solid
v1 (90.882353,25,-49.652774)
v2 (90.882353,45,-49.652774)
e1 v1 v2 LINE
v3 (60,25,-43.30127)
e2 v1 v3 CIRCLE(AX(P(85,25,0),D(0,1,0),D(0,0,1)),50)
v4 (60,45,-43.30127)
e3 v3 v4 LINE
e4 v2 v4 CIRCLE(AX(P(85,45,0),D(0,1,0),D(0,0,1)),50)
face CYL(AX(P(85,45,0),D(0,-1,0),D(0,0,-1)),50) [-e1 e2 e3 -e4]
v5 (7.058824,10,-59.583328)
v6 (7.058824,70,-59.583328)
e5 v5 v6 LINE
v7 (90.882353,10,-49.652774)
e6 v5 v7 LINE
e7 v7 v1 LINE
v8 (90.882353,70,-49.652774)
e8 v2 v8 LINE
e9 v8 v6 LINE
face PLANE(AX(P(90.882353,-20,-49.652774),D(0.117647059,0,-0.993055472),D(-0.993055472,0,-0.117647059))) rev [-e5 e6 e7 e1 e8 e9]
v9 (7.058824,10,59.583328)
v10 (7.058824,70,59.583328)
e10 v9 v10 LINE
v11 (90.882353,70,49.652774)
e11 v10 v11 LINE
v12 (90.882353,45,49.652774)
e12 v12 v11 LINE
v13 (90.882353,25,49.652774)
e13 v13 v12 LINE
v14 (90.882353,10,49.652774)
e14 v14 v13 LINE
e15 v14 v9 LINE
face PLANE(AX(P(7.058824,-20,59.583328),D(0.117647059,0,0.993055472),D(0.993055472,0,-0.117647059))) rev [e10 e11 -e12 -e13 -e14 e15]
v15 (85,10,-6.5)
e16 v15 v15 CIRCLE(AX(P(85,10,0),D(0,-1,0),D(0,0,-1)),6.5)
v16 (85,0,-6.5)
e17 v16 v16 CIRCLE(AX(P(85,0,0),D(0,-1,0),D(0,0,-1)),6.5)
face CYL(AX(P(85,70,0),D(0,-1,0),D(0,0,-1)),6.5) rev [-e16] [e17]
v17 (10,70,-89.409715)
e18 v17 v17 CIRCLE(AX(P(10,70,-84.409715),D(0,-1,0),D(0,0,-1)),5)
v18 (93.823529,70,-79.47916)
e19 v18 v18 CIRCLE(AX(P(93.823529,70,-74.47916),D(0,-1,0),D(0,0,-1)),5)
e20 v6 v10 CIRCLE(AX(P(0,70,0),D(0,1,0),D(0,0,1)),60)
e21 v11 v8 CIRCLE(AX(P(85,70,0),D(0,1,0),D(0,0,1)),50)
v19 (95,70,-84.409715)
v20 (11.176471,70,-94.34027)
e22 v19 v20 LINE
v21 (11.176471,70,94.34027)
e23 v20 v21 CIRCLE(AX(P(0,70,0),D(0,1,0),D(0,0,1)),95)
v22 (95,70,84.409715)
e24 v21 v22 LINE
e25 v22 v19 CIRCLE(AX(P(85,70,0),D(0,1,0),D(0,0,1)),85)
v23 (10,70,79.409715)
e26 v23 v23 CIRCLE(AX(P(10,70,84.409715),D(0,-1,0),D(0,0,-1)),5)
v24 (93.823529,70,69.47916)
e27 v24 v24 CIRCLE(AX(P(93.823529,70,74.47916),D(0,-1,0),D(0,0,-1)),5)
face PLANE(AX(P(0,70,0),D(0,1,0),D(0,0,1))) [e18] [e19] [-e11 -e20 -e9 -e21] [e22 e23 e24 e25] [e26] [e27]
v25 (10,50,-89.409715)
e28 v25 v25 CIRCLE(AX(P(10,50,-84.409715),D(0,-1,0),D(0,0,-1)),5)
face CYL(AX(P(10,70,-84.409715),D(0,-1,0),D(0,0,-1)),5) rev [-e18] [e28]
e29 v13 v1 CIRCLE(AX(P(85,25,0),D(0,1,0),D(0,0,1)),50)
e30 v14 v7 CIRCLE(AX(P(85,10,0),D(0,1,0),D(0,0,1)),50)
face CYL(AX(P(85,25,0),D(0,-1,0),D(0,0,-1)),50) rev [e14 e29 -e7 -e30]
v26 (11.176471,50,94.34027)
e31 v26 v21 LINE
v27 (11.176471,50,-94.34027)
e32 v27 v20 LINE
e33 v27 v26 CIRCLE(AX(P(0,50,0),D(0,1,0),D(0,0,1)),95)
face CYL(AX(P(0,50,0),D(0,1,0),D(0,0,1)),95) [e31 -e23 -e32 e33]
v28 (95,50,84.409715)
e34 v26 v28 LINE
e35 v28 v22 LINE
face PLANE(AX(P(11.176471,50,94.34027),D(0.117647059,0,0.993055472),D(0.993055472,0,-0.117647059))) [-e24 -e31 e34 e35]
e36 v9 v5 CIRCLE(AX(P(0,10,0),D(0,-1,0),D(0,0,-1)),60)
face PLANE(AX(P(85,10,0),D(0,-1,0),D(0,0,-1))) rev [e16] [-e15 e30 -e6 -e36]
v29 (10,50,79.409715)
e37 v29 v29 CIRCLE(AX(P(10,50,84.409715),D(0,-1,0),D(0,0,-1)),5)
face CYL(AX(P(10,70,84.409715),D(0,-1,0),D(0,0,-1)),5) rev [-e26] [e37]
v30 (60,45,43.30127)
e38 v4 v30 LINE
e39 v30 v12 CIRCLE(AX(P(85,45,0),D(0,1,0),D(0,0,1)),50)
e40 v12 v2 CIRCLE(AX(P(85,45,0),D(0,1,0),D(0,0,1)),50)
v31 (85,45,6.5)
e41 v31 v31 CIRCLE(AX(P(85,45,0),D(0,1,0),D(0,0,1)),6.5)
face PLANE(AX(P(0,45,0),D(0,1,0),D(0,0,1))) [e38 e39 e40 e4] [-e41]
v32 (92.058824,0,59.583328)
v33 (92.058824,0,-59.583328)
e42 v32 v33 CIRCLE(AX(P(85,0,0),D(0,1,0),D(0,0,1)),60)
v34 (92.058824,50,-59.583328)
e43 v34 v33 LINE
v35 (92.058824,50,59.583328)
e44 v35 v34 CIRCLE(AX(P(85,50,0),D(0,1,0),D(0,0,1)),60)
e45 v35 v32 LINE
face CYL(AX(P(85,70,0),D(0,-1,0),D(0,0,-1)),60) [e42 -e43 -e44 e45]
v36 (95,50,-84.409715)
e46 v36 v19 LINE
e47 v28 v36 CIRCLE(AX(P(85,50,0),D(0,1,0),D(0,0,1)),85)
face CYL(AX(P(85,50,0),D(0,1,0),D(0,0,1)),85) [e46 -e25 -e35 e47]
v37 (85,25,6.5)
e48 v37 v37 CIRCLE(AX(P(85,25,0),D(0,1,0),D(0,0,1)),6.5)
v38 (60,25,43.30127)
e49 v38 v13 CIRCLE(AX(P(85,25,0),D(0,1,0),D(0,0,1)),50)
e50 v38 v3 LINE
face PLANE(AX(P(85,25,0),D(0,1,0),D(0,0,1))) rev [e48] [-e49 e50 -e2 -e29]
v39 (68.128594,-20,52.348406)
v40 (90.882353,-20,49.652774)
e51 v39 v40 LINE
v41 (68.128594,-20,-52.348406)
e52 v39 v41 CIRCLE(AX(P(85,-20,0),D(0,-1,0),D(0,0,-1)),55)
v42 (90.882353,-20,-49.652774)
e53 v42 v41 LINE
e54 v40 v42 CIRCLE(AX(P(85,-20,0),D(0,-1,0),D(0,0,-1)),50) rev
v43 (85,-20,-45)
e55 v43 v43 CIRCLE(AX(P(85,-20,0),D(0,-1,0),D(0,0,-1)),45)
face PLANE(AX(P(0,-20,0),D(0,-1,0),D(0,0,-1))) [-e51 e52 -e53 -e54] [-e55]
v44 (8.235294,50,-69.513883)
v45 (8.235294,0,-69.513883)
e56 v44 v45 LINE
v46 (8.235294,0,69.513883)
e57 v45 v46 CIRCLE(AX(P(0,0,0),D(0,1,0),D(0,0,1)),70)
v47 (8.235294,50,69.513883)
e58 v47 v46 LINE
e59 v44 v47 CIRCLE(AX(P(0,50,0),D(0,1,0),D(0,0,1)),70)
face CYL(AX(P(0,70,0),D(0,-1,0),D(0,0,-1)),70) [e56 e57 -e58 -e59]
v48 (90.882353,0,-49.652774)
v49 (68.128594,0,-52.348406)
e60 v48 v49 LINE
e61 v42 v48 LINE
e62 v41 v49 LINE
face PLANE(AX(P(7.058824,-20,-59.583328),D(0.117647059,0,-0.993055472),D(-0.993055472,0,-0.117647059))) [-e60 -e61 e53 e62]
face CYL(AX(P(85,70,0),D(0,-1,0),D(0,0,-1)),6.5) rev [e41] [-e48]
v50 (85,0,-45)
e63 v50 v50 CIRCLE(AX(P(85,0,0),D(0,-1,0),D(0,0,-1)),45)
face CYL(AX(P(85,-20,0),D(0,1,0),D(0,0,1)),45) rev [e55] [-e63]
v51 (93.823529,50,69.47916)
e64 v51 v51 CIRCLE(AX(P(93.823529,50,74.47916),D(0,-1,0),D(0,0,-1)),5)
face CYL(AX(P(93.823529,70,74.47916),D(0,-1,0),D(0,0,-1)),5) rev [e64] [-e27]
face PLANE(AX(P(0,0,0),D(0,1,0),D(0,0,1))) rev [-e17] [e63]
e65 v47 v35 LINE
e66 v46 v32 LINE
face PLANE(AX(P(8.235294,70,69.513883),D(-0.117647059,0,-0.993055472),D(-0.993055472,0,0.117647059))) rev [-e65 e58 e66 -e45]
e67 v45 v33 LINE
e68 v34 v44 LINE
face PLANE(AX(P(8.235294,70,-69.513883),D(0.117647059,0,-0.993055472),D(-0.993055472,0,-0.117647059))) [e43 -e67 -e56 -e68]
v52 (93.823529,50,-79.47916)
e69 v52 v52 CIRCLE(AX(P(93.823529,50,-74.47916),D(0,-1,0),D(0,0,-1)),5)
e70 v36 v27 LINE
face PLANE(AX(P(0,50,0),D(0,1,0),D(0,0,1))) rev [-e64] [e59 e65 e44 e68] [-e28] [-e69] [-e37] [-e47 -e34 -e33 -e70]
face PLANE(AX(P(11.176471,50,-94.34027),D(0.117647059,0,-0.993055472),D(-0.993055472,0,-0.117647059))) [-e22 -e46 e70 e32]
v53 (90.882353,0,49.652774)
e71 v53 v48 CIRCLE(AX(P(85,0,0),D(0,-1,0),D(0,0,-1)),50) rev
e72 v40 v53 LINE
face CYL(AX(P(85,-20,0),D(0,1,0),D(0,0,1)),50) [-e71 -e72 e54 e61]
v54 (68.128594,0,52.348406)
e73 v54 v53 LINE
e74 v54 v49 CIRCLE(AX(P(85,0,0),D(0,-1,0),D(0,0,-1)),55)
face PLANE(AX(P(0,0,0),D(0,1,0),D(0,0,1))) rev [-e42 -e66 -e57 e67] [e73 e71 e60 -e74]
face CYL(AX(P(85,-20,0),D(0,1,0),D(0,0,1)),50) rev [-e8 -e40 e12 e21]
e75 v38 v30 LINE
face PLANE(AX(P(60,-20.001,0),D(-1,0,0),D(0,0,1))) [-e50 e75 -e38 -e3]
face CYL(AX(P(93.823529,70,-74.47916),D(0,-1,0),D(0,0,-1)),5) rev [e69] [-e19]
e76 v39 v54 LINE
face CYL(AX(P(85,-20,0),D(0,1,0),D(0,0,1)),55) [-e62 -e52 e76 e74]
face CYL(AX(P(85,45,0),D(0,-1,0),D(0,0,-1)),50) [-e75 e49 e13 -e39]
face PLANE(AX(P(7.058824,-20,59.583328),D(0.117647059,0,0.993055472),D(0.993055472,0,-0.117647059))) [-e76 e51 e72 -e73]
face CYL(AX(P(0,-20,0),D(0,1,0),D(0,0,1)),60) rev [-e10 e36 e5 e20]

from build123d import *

# Parameters (mm, degrees)
EXTRUDE_2_DEPTH     = 70
CUT_EXTRUDE_1_DEPTH = 90
EXTRUDE_3_OUTLINE_R = 45
EXTRUDE_3_DEPTH     = 20
EXTRUDE_START       = -10
EXTRUDE_4_DEPTH     = 10
EXTRUDE_START_2     = -20
EXTRUDE_5_DEPTH     = 20
CUT_EXTRUDE_2_DEPTH = 207.942020866
EXTRUDE_START_3     = 35
SKETCH_13_R         = 50
EXTRUDE_6_DEPTH     = 35
CUT_EXTRUDE_START   = 15
CUT_EXTRUDE_3_DEPTH = 15
SKETCH_15_R         = 6.5
CUT_EXTRUDE_4_DEPTH = 207.942020866
CUT_EXTRUDE_5_REACH = 207.305


# Read off the part's stored shape, not the designer's step: 凸台-拉伸3
with BuildPart() as part:
    # 草图1 → 凸台-拉伸2 (new body)
    with BuildSketch(Plane(origin=(0, 0, 0), x_dir=(1, 0, 0), z_dir=(0, 1, 0))):
        with BuildLine():
            Line((8.235294118, 69.513883008), (92.058823529, 59.583328292))
            ThreePointArc((92.058823529, 59.583328292), (145, 0), (92.058823529, -59.583328292))
            Line((92.058823529, -59.583328292), (8.235294118, -69.513883008))
            ThreePointArc((8.235294118, -69.513883008), (-70, 0), (8.235294118, 69.513883008))
        make_face()
    extrude(amount=EXTRUDE_2_DEPTH)

    # 草图2 → 切除-拉伸1 (cut)
    with BuildSketch(Plane(origin=(0, 70, 0), x_dir=(1, 0, 0), z_dir=(0, 1, 0))):
        with BuildLine():
            Line((7.058823529, -59.583328292), (90.882352941, -49.652773577))
            ThreePointArc((90.882352941, -49.652773577), (135, 0), (90.882352941, 49.652773577))
            Line((90.882352941, 49.652773577), (7.058823529, 59.583328292))
            ThreePointArc((7.058823529, 59.583328292), (-60, 0), (7.058823529, -59.583328292))
        make_face()
    extrude(amount=-CUT_EXTRUDE_1_DEPTH, mode=Mode.SUBTRACT)



with BuildPart() as body_2:
    # 凸台-拉伸3 outline → 凸台-拉伸3 (new body)
    with BuildSketch(Plane.XZ):
        with BuildLine():
            ThreePointArc((90.882352941, -49.652773577), (135, 0), (90.882352941, 49.652773577))
            Line((90.882352941, 49.652773577), (68.128593603, 52.348406339))
            ThreePointArc((68.128593603, 52.348406339), (30, 0), (68.128593603, -52.348406339))
            Line((68.128593603, -52.348406339), (90.882352941, -49.652773577))
        make_face()
        with Locations((85, 0)):
            Circle(EXTRUDE_3_OUTLINE_R, mode=Mode.SUBTRACT)
    extrude(amount=EXTRUDE_3_DEPTH)


with BuildPart() as part_1:
    add(part.part)

    add(body_2.part)  # 凸台-拉伸4 merges body 2
    # 草图8 → 凸台-拉伸4 (add)
    with BuildSketch(Plane.XZ.offset(EXTRUDE_START)):
        with BuildLine():
            Line((90.882352941, -49.652773577), (7.058823529, -59.583328292))
            ThreePointArc((7.058823529, -59.583328292), (-60, 0), (7.058823529, 59.583328292))
            Line((7.058823529, 59.583328292), (90.882352941, 49.652773577))
            ThreePointArc((90.882352941, 49.652773577), (135, 0), (90.882352941, -49.652773577))
        make_face()
    extrude(amount=EXTRUDE_4_DEPTH)

    # 草图9 → 凸台-拉伸5 (add)
    with BuildSketch(Plane(origin=(0, 70, 0), x_dir=(1, 0, 0), z_dir=(0, 1, 0)).offset(EXTRUDE_START_2)):
        with BuildLine():
            Line((11.176470588, 94.340269796), (95, 84.409715081))
            ThreePointArc((95, 84.409715081), (170, 0), (95, -84.409715081))
            Line((95, -84.409715081), (11.176470588, -94.340269796))
            ThreePointArc((11.176470588, -94.340269796), (-95, 0), (11.176470588, 94.340269796))
        make_face()
        with BuildLine():
            Line((8.235294118, -69.513883008), (92.058823529, -59.583328292))
            ThreePointArc((92.058823529, -59.583328292), (145, 0), (92.058823529, 59.583328292))
            Line((92.058823529, 59.583328292), (8.235294118, 69.513883008))
            ThreePointArc((8.235294118, 69.513883008), (-70, 0), (8.235294118, -69.513883008))
        make_face(mode=Mode.SUBTRACT)
    extrude(amount=EXTRUDE_5_DEPTH)

    # 草图10 → 切除-拉伸2 (cut, through all)
    with BuildSketch(Plane.XZ.offset(-50)):
        with BuildLine():
            ThreePointArc((88.858252054, 75.067395659), (93.152609723, 69.524378153), (98.766439672, 73.725742714))
            ThreePointArc((98.766439672, 73.725742714), (96.301264767, 74.143653907), (93.823529412, 74.479160365))
            Line((93.823529412, 74.479160365), (88.858252054, 75.067395659))
        make_face()
        with BuildLine():
            ThreePointArc((93.823529412, 74.479160365), (96.301264767, 74.143653907), (98.766439672, 73.725742714))
            ThreePointArc((98.766439672, 73.725742714), (98.809236548, 74.101371603), (98.823529412, 74.479160365))
            ThreePointArc((98.823529412, 74.479160365), (94.11815902, 79.470472156), (88.858252054, 75.067395659))
            Line((88.858252054, 75.067395659), (93.823529412, 74.479160365))
        make_face()
        with BuildLine():
            ThreePointArc((88.858252054, 75.067395659), (93.152609723, 69.524378153), (98.766439672, 73.725742714))
            ThreePointArc((98.766439672, 73.725742714), (96.301264767, 74.143653907), (93.823529412, 74.479160365))
            Line((93.823529412, 74.479160365), (88.858252054, 75.067395659))
        make_face()
        with BuildLine():
            ThreePointArc((93.823529412, 74.479160365), (96.301264767, 74.143653907), (98.766439672, 73.725742714))
            ThreePointArc((98.766439672, 73.725742714), (98.809236548, 74.101371603), (98.823529412, 74.479160365))
            ThreePointArc((98.823529412, 74.479160365), (94.11815902, 79.470472156), (88.858252054, 75.067395659))
            Line((88.858252054, 75.067395659), (93.823529412, 74.479160365))
        make_face()
        with BuildLine():
            ThreePointArc((10, 84.409715081), (7.513035126, 84.667315436), (5.01956968, 84.851658323))
            ThreePointArc((5.01956968, 84.851658323), (9.484855013, 79.436323316), (14.965277358, 83.821479787))
            Line((14.965277358, 83.821479787), (10, 84.409715081))
        make_face()
        with BuildLine():
            ThreePointArc((15, 84.409715081), (10.221188156, 89.404820265), (5.01956968, 84.851658323))
            ThreePointArc((5.01956968, 84.851658323), (7.513035126, 84.667315436), (10, 84.409715081))
            Line((10, 84.409715081), (14.965277358, 83.821479787))
            ThreePointArc((14.965277358, 83.821479787), (14.991311791, 84.115085473), (15, 84.409715081))
        make_face()
        with BuildLine():
            ThreePointArc((10, 84.409715081), (7.513035126, 84.667315436), (5.01956968, 84.851658323))
            ThreePointArc((5.01956968, 84.851658323), (9.484855013, 79.436323316), (14.965277358, 83.821479787))
            Line((14.965277358, 83.821479787), (10, 84.409715081))
        make_face()
        with BuildLine():
            ThreePointArc((15, 84.409715081), (10.221188156, 89.404820265), (5.01956968, 84.851658323))
            ThreePointArc((5.01956968, 84.851658323), (7.513035126, 84.667315436), (10, 84.409715081))
            Line((10, 84.409715081), (14.965277358, 83.821479787))
            ThreePointArc((14.965277358, 83.821479787), (14.991311791, 84.115085473), (15, 84.409715081))
        make_face()
        with BuildLine():
            ThreePointArc((5.01956968, -84.851658323), (7.513035126, -84.667315436), (10, -84.409715081))
            Line((10, -84.409715081), (14.965277358, -83.821479787))
            ThreePointArc((14.965277358, -83.821479787), (9.484855013, -79.436323316), (5.01956968, -84.851658323))
        make_face()
        with BuildLine():
            Line((14.965277358, -83.821479787), (10, -84.409715081))
            ThreePointArc((10, -84.409715081), (7.513035126, -84.667315436), (5.01956968, -84.851658323))
            ThreePointArc((5.01956968, -84.851658323), (10.221188156, -89.404820265), (15, -84.409715081))
            ThreePointArc((15, -84.409715081), (14.991311791, -84.115085473), (14.965277358, -83.821479787))
        make_face()
        with BuildLine():
            ThreePointArc((5.01956968, -84.851658323), (7.513035126, -84.667315436), (10, -84.409715081))
            Line((10, -84.409715081), (14.965277358, -83.821479787))
            ThreePointArc((14.965277358, -83.821479787), (9.484855013, -79.436323316), (5.01956968, -84.851658323))
        make_face()
        with BuildLine():
            Line((14.965277358, -83.821479787), (10, -84.409715081))
            ThreePointArc((10, -84.409715081), (7.513035126, -84.667315436), (5.01956968, -84.851658323))
            ThreePointArc((5.01956968, -84.851658323), (10.221188156, -89.404820265), (15, -84.409715081))
            ThreePointArc((15, -84.409715081), (14.991311791, -84.115085473), (14.965277358, -83.821479787))
        make_face()
        with BuildLine():
            ThreePointArc((98.766439672, -73.725742714), (93.152609723, -69.524378153), (88.858252054, -75.067395659))
            Line((88.858252054, -75.067395659), (93.823529412, -74.479160365))
            ThreePointArc((93.823529412, -74.479160365), (96.301264767, -74.143653907), (98.766439672, -73.725742714))
        make_face()
        with BuildLine():
            Line((93.823529412, -74.479160365), (88.858252054, -75.067395659))
            ThreePointArc((88.858252054, -75.067395659), (94.11815902, -79.470472156), (98.823529412, -74.479160365))
            ThreePointArc((98.823529412, -74.479160365), (98.809236548, -74.101371603), (98.766439672, -73.725742714))
            ThreePointArc((98.766439672, -73.725742714), (96.301264767, -74.143653907), (93.823529412, -74.479160365))
        make_face()
        with BuildLine():
            ThreePointArc((98.766439672, -73.725742714), (93.152609723, -69.524378153), (88.858252054, -75.067395659))
            Line((88.858252054, -75.067395659), (93.823529412, -74.479160365))
            ThreePointArc((93.823529412, -74.479160365), (96.301264767, -74.143653907), (98.766439672, -73.725742714))
        make_face()
        with BuildLine():
            Line((93.823529412, -74.479160365), (88.858252054, -75.067395659))
            ThreePointArc((88.858252054, -75.067395659), (94.11815902, -79.470472156), (98.823529412, -74.479160365))
            ThreePointArc((98.823529412, -74.479160365), (98.809236548, -74.101371603), (98.766439672, -73.725742714))
            ThreePointArc((98.766439672, -73.725742714), (96.301264767, -74.143653907), (93.823529412, -74.479160365))
        make_face()
    extrude(amount=-CUT_EXTRUDE_2_DEPTH, mode=Mode.SUBTRACT)

    # 草图13 → 凸台-拉伸6 (add)
    with BuildSketch(Plane(origin=(0, 10, 0), x_dir=(1, 0, 0), z_dir=(0, 1, 0)).offset(EXTRUDE_START_3)):
        with Locations((85, 0)):
            Circle(SKETCH_13_R)
    extrude(amount=-EXTRUDE_6_DEPTH)

    # 草图14 → 切除-拉伸3 (cut)
    with BuildSketch(Plane(origin=(0, 10, 0), x_dir=(1, 0, 0), z_dir=(0, 1, 0)).offset(CUT_EXTRUDE_START)):
        with BuildLine():
            ThreePointArc((90.882352941, -49.652773577), (135, 0), (90.882352941, 49.652773577))
            ThreePointArc((90.882352941, 49.652773577), (35, 0), (90.882352941, -49.652773577))
        make_face()
    extrude(amount=-CUT_EXTRUDE_3_DEPTH, mode=Mode.SUBTRACT)

    # 草图15 → 切除-拉伸4 (cut, through all)
    with BuildSketch(Plane.XZ):
        with Locations(Location((85, 0, 0), (0, 0, 90))):
            Circle(SKETCH_15_R)
    extrude(amount=-CUT_EXTRUDE_4_DEPTH, mode=Mode.SUBTRACT)

    # 草图16 → 切除-拉伸5 (cut, up to next)
    with BuildSketch(Plane(origin=(0, 45, 0), x_dir=(1, 0, 0), z_dir=(0, 1, 0)), mode=Mode.PRIVATE) as cut_extrude_5_sk1:
        with BuildLine():
            Line((60, 0), (60, 43.301270189))
            ThreePointArc((60, 43.301270189), (41.698729811, 25), (35, 0))
            Line((35, 0), (60, 0))
        make_face()
    cut_extrude_5_tool1 = extrude(cut_extrude_5_sk1.sketch, amount=-CUT_EXTRUDE_5_REACH, mode=Mode.PRIVATE) & part_1.part
    # 草图16 → 切除-拉伸5 (cut, up to next)
    with BuildSketch(Plane(origin=(0, 45, 0), x_dir=(1, 0, 0), z_dir=(0, 1, 0)), mode=Mode.PRIVATE) as cut_extrude_5_sk2:
        with BuildLine():
            ThreePointArc((35, 0), (41.698729811, -25), (60, -43.301270189))
            Line((60, -43.301270189), (60, 0))
            Line((60, 0), (35, 0))
        make_face()
    cut_extrude_5_tool2 = extrude(cut_extrude_5_sk2.sketch, amount=-CUT_EXTRUDE_5_REACH, mode=Mode.PRIVATE) & part_1.part
    # 草图16 → 切除-拉伸5 (cut, up to next)
    with BuildSketch(Plane(origin=(0, 45, 0), x_dir=(1, 0, 0), z_dir=(0, 1, 0)), mode=Mode.PRIVATE) as cut_extrude_5_sk3:
        with BuildLine():
            Line((60, 0), (60, 43.301270189))
            ThreePointArc((60, 43.301270189), (41.698729811, 25), (35, 0))
            Line((35, 0), (60, 0))
        make_face()
    cut_extrude_5_tool3 = extrude(cut_extrude_5_sk3.sketch, amount=-CUT_EXTRUDE_5_REACH, mode=Mode.PRIVATE) & part_1.part
    # 草图16 → 切除-拉伸5 (cut, up to next)
    with BuildSketch(Plane(origin=(0, 45, 0), x_dir=(1, 0, 0), z_dir=(0, 1, 0)), mode=Mode.PRIVATE) as cut_extrude_5_sk4:
        with BuildLine():
            ThreePointArc((35, 0), (41.698729811, -25), (60, -43.301270189))
            Line((60, -43.301270189), (60, 0))
            Line((60, 0), (35, 0))
        make_face()
    cut_extrude_5_tool4 = extrude(cut_extrude_5_sk4.sketch, amount=-CUT_EXTRUDE_5_REACH, mode=Mode.PRIVATE) & part_1.part
    add(cut_extrude_5_tool1.solids().sort_by_distance((49.748992, 45, -16.960149))[0], mode=Mode.SUBTRACT)
    add(cut_extrude_5_tool2.solids().sort_by_distance((49.748992, 45, 16.960149))[0], mode=Mode.SUBTRACT)
    add(cut_extrude_5_tool3.solids().sort_by_distance((49.748992, 45, -16.960149))[0], mode=Mode.SUBTRACT)
    add(cut_extrude_5_tool4.solids().sort_by_distance((49.748992, 45, 16.960149))[0], mode=Mode.SUBTRACT)


solid = part_1.part
